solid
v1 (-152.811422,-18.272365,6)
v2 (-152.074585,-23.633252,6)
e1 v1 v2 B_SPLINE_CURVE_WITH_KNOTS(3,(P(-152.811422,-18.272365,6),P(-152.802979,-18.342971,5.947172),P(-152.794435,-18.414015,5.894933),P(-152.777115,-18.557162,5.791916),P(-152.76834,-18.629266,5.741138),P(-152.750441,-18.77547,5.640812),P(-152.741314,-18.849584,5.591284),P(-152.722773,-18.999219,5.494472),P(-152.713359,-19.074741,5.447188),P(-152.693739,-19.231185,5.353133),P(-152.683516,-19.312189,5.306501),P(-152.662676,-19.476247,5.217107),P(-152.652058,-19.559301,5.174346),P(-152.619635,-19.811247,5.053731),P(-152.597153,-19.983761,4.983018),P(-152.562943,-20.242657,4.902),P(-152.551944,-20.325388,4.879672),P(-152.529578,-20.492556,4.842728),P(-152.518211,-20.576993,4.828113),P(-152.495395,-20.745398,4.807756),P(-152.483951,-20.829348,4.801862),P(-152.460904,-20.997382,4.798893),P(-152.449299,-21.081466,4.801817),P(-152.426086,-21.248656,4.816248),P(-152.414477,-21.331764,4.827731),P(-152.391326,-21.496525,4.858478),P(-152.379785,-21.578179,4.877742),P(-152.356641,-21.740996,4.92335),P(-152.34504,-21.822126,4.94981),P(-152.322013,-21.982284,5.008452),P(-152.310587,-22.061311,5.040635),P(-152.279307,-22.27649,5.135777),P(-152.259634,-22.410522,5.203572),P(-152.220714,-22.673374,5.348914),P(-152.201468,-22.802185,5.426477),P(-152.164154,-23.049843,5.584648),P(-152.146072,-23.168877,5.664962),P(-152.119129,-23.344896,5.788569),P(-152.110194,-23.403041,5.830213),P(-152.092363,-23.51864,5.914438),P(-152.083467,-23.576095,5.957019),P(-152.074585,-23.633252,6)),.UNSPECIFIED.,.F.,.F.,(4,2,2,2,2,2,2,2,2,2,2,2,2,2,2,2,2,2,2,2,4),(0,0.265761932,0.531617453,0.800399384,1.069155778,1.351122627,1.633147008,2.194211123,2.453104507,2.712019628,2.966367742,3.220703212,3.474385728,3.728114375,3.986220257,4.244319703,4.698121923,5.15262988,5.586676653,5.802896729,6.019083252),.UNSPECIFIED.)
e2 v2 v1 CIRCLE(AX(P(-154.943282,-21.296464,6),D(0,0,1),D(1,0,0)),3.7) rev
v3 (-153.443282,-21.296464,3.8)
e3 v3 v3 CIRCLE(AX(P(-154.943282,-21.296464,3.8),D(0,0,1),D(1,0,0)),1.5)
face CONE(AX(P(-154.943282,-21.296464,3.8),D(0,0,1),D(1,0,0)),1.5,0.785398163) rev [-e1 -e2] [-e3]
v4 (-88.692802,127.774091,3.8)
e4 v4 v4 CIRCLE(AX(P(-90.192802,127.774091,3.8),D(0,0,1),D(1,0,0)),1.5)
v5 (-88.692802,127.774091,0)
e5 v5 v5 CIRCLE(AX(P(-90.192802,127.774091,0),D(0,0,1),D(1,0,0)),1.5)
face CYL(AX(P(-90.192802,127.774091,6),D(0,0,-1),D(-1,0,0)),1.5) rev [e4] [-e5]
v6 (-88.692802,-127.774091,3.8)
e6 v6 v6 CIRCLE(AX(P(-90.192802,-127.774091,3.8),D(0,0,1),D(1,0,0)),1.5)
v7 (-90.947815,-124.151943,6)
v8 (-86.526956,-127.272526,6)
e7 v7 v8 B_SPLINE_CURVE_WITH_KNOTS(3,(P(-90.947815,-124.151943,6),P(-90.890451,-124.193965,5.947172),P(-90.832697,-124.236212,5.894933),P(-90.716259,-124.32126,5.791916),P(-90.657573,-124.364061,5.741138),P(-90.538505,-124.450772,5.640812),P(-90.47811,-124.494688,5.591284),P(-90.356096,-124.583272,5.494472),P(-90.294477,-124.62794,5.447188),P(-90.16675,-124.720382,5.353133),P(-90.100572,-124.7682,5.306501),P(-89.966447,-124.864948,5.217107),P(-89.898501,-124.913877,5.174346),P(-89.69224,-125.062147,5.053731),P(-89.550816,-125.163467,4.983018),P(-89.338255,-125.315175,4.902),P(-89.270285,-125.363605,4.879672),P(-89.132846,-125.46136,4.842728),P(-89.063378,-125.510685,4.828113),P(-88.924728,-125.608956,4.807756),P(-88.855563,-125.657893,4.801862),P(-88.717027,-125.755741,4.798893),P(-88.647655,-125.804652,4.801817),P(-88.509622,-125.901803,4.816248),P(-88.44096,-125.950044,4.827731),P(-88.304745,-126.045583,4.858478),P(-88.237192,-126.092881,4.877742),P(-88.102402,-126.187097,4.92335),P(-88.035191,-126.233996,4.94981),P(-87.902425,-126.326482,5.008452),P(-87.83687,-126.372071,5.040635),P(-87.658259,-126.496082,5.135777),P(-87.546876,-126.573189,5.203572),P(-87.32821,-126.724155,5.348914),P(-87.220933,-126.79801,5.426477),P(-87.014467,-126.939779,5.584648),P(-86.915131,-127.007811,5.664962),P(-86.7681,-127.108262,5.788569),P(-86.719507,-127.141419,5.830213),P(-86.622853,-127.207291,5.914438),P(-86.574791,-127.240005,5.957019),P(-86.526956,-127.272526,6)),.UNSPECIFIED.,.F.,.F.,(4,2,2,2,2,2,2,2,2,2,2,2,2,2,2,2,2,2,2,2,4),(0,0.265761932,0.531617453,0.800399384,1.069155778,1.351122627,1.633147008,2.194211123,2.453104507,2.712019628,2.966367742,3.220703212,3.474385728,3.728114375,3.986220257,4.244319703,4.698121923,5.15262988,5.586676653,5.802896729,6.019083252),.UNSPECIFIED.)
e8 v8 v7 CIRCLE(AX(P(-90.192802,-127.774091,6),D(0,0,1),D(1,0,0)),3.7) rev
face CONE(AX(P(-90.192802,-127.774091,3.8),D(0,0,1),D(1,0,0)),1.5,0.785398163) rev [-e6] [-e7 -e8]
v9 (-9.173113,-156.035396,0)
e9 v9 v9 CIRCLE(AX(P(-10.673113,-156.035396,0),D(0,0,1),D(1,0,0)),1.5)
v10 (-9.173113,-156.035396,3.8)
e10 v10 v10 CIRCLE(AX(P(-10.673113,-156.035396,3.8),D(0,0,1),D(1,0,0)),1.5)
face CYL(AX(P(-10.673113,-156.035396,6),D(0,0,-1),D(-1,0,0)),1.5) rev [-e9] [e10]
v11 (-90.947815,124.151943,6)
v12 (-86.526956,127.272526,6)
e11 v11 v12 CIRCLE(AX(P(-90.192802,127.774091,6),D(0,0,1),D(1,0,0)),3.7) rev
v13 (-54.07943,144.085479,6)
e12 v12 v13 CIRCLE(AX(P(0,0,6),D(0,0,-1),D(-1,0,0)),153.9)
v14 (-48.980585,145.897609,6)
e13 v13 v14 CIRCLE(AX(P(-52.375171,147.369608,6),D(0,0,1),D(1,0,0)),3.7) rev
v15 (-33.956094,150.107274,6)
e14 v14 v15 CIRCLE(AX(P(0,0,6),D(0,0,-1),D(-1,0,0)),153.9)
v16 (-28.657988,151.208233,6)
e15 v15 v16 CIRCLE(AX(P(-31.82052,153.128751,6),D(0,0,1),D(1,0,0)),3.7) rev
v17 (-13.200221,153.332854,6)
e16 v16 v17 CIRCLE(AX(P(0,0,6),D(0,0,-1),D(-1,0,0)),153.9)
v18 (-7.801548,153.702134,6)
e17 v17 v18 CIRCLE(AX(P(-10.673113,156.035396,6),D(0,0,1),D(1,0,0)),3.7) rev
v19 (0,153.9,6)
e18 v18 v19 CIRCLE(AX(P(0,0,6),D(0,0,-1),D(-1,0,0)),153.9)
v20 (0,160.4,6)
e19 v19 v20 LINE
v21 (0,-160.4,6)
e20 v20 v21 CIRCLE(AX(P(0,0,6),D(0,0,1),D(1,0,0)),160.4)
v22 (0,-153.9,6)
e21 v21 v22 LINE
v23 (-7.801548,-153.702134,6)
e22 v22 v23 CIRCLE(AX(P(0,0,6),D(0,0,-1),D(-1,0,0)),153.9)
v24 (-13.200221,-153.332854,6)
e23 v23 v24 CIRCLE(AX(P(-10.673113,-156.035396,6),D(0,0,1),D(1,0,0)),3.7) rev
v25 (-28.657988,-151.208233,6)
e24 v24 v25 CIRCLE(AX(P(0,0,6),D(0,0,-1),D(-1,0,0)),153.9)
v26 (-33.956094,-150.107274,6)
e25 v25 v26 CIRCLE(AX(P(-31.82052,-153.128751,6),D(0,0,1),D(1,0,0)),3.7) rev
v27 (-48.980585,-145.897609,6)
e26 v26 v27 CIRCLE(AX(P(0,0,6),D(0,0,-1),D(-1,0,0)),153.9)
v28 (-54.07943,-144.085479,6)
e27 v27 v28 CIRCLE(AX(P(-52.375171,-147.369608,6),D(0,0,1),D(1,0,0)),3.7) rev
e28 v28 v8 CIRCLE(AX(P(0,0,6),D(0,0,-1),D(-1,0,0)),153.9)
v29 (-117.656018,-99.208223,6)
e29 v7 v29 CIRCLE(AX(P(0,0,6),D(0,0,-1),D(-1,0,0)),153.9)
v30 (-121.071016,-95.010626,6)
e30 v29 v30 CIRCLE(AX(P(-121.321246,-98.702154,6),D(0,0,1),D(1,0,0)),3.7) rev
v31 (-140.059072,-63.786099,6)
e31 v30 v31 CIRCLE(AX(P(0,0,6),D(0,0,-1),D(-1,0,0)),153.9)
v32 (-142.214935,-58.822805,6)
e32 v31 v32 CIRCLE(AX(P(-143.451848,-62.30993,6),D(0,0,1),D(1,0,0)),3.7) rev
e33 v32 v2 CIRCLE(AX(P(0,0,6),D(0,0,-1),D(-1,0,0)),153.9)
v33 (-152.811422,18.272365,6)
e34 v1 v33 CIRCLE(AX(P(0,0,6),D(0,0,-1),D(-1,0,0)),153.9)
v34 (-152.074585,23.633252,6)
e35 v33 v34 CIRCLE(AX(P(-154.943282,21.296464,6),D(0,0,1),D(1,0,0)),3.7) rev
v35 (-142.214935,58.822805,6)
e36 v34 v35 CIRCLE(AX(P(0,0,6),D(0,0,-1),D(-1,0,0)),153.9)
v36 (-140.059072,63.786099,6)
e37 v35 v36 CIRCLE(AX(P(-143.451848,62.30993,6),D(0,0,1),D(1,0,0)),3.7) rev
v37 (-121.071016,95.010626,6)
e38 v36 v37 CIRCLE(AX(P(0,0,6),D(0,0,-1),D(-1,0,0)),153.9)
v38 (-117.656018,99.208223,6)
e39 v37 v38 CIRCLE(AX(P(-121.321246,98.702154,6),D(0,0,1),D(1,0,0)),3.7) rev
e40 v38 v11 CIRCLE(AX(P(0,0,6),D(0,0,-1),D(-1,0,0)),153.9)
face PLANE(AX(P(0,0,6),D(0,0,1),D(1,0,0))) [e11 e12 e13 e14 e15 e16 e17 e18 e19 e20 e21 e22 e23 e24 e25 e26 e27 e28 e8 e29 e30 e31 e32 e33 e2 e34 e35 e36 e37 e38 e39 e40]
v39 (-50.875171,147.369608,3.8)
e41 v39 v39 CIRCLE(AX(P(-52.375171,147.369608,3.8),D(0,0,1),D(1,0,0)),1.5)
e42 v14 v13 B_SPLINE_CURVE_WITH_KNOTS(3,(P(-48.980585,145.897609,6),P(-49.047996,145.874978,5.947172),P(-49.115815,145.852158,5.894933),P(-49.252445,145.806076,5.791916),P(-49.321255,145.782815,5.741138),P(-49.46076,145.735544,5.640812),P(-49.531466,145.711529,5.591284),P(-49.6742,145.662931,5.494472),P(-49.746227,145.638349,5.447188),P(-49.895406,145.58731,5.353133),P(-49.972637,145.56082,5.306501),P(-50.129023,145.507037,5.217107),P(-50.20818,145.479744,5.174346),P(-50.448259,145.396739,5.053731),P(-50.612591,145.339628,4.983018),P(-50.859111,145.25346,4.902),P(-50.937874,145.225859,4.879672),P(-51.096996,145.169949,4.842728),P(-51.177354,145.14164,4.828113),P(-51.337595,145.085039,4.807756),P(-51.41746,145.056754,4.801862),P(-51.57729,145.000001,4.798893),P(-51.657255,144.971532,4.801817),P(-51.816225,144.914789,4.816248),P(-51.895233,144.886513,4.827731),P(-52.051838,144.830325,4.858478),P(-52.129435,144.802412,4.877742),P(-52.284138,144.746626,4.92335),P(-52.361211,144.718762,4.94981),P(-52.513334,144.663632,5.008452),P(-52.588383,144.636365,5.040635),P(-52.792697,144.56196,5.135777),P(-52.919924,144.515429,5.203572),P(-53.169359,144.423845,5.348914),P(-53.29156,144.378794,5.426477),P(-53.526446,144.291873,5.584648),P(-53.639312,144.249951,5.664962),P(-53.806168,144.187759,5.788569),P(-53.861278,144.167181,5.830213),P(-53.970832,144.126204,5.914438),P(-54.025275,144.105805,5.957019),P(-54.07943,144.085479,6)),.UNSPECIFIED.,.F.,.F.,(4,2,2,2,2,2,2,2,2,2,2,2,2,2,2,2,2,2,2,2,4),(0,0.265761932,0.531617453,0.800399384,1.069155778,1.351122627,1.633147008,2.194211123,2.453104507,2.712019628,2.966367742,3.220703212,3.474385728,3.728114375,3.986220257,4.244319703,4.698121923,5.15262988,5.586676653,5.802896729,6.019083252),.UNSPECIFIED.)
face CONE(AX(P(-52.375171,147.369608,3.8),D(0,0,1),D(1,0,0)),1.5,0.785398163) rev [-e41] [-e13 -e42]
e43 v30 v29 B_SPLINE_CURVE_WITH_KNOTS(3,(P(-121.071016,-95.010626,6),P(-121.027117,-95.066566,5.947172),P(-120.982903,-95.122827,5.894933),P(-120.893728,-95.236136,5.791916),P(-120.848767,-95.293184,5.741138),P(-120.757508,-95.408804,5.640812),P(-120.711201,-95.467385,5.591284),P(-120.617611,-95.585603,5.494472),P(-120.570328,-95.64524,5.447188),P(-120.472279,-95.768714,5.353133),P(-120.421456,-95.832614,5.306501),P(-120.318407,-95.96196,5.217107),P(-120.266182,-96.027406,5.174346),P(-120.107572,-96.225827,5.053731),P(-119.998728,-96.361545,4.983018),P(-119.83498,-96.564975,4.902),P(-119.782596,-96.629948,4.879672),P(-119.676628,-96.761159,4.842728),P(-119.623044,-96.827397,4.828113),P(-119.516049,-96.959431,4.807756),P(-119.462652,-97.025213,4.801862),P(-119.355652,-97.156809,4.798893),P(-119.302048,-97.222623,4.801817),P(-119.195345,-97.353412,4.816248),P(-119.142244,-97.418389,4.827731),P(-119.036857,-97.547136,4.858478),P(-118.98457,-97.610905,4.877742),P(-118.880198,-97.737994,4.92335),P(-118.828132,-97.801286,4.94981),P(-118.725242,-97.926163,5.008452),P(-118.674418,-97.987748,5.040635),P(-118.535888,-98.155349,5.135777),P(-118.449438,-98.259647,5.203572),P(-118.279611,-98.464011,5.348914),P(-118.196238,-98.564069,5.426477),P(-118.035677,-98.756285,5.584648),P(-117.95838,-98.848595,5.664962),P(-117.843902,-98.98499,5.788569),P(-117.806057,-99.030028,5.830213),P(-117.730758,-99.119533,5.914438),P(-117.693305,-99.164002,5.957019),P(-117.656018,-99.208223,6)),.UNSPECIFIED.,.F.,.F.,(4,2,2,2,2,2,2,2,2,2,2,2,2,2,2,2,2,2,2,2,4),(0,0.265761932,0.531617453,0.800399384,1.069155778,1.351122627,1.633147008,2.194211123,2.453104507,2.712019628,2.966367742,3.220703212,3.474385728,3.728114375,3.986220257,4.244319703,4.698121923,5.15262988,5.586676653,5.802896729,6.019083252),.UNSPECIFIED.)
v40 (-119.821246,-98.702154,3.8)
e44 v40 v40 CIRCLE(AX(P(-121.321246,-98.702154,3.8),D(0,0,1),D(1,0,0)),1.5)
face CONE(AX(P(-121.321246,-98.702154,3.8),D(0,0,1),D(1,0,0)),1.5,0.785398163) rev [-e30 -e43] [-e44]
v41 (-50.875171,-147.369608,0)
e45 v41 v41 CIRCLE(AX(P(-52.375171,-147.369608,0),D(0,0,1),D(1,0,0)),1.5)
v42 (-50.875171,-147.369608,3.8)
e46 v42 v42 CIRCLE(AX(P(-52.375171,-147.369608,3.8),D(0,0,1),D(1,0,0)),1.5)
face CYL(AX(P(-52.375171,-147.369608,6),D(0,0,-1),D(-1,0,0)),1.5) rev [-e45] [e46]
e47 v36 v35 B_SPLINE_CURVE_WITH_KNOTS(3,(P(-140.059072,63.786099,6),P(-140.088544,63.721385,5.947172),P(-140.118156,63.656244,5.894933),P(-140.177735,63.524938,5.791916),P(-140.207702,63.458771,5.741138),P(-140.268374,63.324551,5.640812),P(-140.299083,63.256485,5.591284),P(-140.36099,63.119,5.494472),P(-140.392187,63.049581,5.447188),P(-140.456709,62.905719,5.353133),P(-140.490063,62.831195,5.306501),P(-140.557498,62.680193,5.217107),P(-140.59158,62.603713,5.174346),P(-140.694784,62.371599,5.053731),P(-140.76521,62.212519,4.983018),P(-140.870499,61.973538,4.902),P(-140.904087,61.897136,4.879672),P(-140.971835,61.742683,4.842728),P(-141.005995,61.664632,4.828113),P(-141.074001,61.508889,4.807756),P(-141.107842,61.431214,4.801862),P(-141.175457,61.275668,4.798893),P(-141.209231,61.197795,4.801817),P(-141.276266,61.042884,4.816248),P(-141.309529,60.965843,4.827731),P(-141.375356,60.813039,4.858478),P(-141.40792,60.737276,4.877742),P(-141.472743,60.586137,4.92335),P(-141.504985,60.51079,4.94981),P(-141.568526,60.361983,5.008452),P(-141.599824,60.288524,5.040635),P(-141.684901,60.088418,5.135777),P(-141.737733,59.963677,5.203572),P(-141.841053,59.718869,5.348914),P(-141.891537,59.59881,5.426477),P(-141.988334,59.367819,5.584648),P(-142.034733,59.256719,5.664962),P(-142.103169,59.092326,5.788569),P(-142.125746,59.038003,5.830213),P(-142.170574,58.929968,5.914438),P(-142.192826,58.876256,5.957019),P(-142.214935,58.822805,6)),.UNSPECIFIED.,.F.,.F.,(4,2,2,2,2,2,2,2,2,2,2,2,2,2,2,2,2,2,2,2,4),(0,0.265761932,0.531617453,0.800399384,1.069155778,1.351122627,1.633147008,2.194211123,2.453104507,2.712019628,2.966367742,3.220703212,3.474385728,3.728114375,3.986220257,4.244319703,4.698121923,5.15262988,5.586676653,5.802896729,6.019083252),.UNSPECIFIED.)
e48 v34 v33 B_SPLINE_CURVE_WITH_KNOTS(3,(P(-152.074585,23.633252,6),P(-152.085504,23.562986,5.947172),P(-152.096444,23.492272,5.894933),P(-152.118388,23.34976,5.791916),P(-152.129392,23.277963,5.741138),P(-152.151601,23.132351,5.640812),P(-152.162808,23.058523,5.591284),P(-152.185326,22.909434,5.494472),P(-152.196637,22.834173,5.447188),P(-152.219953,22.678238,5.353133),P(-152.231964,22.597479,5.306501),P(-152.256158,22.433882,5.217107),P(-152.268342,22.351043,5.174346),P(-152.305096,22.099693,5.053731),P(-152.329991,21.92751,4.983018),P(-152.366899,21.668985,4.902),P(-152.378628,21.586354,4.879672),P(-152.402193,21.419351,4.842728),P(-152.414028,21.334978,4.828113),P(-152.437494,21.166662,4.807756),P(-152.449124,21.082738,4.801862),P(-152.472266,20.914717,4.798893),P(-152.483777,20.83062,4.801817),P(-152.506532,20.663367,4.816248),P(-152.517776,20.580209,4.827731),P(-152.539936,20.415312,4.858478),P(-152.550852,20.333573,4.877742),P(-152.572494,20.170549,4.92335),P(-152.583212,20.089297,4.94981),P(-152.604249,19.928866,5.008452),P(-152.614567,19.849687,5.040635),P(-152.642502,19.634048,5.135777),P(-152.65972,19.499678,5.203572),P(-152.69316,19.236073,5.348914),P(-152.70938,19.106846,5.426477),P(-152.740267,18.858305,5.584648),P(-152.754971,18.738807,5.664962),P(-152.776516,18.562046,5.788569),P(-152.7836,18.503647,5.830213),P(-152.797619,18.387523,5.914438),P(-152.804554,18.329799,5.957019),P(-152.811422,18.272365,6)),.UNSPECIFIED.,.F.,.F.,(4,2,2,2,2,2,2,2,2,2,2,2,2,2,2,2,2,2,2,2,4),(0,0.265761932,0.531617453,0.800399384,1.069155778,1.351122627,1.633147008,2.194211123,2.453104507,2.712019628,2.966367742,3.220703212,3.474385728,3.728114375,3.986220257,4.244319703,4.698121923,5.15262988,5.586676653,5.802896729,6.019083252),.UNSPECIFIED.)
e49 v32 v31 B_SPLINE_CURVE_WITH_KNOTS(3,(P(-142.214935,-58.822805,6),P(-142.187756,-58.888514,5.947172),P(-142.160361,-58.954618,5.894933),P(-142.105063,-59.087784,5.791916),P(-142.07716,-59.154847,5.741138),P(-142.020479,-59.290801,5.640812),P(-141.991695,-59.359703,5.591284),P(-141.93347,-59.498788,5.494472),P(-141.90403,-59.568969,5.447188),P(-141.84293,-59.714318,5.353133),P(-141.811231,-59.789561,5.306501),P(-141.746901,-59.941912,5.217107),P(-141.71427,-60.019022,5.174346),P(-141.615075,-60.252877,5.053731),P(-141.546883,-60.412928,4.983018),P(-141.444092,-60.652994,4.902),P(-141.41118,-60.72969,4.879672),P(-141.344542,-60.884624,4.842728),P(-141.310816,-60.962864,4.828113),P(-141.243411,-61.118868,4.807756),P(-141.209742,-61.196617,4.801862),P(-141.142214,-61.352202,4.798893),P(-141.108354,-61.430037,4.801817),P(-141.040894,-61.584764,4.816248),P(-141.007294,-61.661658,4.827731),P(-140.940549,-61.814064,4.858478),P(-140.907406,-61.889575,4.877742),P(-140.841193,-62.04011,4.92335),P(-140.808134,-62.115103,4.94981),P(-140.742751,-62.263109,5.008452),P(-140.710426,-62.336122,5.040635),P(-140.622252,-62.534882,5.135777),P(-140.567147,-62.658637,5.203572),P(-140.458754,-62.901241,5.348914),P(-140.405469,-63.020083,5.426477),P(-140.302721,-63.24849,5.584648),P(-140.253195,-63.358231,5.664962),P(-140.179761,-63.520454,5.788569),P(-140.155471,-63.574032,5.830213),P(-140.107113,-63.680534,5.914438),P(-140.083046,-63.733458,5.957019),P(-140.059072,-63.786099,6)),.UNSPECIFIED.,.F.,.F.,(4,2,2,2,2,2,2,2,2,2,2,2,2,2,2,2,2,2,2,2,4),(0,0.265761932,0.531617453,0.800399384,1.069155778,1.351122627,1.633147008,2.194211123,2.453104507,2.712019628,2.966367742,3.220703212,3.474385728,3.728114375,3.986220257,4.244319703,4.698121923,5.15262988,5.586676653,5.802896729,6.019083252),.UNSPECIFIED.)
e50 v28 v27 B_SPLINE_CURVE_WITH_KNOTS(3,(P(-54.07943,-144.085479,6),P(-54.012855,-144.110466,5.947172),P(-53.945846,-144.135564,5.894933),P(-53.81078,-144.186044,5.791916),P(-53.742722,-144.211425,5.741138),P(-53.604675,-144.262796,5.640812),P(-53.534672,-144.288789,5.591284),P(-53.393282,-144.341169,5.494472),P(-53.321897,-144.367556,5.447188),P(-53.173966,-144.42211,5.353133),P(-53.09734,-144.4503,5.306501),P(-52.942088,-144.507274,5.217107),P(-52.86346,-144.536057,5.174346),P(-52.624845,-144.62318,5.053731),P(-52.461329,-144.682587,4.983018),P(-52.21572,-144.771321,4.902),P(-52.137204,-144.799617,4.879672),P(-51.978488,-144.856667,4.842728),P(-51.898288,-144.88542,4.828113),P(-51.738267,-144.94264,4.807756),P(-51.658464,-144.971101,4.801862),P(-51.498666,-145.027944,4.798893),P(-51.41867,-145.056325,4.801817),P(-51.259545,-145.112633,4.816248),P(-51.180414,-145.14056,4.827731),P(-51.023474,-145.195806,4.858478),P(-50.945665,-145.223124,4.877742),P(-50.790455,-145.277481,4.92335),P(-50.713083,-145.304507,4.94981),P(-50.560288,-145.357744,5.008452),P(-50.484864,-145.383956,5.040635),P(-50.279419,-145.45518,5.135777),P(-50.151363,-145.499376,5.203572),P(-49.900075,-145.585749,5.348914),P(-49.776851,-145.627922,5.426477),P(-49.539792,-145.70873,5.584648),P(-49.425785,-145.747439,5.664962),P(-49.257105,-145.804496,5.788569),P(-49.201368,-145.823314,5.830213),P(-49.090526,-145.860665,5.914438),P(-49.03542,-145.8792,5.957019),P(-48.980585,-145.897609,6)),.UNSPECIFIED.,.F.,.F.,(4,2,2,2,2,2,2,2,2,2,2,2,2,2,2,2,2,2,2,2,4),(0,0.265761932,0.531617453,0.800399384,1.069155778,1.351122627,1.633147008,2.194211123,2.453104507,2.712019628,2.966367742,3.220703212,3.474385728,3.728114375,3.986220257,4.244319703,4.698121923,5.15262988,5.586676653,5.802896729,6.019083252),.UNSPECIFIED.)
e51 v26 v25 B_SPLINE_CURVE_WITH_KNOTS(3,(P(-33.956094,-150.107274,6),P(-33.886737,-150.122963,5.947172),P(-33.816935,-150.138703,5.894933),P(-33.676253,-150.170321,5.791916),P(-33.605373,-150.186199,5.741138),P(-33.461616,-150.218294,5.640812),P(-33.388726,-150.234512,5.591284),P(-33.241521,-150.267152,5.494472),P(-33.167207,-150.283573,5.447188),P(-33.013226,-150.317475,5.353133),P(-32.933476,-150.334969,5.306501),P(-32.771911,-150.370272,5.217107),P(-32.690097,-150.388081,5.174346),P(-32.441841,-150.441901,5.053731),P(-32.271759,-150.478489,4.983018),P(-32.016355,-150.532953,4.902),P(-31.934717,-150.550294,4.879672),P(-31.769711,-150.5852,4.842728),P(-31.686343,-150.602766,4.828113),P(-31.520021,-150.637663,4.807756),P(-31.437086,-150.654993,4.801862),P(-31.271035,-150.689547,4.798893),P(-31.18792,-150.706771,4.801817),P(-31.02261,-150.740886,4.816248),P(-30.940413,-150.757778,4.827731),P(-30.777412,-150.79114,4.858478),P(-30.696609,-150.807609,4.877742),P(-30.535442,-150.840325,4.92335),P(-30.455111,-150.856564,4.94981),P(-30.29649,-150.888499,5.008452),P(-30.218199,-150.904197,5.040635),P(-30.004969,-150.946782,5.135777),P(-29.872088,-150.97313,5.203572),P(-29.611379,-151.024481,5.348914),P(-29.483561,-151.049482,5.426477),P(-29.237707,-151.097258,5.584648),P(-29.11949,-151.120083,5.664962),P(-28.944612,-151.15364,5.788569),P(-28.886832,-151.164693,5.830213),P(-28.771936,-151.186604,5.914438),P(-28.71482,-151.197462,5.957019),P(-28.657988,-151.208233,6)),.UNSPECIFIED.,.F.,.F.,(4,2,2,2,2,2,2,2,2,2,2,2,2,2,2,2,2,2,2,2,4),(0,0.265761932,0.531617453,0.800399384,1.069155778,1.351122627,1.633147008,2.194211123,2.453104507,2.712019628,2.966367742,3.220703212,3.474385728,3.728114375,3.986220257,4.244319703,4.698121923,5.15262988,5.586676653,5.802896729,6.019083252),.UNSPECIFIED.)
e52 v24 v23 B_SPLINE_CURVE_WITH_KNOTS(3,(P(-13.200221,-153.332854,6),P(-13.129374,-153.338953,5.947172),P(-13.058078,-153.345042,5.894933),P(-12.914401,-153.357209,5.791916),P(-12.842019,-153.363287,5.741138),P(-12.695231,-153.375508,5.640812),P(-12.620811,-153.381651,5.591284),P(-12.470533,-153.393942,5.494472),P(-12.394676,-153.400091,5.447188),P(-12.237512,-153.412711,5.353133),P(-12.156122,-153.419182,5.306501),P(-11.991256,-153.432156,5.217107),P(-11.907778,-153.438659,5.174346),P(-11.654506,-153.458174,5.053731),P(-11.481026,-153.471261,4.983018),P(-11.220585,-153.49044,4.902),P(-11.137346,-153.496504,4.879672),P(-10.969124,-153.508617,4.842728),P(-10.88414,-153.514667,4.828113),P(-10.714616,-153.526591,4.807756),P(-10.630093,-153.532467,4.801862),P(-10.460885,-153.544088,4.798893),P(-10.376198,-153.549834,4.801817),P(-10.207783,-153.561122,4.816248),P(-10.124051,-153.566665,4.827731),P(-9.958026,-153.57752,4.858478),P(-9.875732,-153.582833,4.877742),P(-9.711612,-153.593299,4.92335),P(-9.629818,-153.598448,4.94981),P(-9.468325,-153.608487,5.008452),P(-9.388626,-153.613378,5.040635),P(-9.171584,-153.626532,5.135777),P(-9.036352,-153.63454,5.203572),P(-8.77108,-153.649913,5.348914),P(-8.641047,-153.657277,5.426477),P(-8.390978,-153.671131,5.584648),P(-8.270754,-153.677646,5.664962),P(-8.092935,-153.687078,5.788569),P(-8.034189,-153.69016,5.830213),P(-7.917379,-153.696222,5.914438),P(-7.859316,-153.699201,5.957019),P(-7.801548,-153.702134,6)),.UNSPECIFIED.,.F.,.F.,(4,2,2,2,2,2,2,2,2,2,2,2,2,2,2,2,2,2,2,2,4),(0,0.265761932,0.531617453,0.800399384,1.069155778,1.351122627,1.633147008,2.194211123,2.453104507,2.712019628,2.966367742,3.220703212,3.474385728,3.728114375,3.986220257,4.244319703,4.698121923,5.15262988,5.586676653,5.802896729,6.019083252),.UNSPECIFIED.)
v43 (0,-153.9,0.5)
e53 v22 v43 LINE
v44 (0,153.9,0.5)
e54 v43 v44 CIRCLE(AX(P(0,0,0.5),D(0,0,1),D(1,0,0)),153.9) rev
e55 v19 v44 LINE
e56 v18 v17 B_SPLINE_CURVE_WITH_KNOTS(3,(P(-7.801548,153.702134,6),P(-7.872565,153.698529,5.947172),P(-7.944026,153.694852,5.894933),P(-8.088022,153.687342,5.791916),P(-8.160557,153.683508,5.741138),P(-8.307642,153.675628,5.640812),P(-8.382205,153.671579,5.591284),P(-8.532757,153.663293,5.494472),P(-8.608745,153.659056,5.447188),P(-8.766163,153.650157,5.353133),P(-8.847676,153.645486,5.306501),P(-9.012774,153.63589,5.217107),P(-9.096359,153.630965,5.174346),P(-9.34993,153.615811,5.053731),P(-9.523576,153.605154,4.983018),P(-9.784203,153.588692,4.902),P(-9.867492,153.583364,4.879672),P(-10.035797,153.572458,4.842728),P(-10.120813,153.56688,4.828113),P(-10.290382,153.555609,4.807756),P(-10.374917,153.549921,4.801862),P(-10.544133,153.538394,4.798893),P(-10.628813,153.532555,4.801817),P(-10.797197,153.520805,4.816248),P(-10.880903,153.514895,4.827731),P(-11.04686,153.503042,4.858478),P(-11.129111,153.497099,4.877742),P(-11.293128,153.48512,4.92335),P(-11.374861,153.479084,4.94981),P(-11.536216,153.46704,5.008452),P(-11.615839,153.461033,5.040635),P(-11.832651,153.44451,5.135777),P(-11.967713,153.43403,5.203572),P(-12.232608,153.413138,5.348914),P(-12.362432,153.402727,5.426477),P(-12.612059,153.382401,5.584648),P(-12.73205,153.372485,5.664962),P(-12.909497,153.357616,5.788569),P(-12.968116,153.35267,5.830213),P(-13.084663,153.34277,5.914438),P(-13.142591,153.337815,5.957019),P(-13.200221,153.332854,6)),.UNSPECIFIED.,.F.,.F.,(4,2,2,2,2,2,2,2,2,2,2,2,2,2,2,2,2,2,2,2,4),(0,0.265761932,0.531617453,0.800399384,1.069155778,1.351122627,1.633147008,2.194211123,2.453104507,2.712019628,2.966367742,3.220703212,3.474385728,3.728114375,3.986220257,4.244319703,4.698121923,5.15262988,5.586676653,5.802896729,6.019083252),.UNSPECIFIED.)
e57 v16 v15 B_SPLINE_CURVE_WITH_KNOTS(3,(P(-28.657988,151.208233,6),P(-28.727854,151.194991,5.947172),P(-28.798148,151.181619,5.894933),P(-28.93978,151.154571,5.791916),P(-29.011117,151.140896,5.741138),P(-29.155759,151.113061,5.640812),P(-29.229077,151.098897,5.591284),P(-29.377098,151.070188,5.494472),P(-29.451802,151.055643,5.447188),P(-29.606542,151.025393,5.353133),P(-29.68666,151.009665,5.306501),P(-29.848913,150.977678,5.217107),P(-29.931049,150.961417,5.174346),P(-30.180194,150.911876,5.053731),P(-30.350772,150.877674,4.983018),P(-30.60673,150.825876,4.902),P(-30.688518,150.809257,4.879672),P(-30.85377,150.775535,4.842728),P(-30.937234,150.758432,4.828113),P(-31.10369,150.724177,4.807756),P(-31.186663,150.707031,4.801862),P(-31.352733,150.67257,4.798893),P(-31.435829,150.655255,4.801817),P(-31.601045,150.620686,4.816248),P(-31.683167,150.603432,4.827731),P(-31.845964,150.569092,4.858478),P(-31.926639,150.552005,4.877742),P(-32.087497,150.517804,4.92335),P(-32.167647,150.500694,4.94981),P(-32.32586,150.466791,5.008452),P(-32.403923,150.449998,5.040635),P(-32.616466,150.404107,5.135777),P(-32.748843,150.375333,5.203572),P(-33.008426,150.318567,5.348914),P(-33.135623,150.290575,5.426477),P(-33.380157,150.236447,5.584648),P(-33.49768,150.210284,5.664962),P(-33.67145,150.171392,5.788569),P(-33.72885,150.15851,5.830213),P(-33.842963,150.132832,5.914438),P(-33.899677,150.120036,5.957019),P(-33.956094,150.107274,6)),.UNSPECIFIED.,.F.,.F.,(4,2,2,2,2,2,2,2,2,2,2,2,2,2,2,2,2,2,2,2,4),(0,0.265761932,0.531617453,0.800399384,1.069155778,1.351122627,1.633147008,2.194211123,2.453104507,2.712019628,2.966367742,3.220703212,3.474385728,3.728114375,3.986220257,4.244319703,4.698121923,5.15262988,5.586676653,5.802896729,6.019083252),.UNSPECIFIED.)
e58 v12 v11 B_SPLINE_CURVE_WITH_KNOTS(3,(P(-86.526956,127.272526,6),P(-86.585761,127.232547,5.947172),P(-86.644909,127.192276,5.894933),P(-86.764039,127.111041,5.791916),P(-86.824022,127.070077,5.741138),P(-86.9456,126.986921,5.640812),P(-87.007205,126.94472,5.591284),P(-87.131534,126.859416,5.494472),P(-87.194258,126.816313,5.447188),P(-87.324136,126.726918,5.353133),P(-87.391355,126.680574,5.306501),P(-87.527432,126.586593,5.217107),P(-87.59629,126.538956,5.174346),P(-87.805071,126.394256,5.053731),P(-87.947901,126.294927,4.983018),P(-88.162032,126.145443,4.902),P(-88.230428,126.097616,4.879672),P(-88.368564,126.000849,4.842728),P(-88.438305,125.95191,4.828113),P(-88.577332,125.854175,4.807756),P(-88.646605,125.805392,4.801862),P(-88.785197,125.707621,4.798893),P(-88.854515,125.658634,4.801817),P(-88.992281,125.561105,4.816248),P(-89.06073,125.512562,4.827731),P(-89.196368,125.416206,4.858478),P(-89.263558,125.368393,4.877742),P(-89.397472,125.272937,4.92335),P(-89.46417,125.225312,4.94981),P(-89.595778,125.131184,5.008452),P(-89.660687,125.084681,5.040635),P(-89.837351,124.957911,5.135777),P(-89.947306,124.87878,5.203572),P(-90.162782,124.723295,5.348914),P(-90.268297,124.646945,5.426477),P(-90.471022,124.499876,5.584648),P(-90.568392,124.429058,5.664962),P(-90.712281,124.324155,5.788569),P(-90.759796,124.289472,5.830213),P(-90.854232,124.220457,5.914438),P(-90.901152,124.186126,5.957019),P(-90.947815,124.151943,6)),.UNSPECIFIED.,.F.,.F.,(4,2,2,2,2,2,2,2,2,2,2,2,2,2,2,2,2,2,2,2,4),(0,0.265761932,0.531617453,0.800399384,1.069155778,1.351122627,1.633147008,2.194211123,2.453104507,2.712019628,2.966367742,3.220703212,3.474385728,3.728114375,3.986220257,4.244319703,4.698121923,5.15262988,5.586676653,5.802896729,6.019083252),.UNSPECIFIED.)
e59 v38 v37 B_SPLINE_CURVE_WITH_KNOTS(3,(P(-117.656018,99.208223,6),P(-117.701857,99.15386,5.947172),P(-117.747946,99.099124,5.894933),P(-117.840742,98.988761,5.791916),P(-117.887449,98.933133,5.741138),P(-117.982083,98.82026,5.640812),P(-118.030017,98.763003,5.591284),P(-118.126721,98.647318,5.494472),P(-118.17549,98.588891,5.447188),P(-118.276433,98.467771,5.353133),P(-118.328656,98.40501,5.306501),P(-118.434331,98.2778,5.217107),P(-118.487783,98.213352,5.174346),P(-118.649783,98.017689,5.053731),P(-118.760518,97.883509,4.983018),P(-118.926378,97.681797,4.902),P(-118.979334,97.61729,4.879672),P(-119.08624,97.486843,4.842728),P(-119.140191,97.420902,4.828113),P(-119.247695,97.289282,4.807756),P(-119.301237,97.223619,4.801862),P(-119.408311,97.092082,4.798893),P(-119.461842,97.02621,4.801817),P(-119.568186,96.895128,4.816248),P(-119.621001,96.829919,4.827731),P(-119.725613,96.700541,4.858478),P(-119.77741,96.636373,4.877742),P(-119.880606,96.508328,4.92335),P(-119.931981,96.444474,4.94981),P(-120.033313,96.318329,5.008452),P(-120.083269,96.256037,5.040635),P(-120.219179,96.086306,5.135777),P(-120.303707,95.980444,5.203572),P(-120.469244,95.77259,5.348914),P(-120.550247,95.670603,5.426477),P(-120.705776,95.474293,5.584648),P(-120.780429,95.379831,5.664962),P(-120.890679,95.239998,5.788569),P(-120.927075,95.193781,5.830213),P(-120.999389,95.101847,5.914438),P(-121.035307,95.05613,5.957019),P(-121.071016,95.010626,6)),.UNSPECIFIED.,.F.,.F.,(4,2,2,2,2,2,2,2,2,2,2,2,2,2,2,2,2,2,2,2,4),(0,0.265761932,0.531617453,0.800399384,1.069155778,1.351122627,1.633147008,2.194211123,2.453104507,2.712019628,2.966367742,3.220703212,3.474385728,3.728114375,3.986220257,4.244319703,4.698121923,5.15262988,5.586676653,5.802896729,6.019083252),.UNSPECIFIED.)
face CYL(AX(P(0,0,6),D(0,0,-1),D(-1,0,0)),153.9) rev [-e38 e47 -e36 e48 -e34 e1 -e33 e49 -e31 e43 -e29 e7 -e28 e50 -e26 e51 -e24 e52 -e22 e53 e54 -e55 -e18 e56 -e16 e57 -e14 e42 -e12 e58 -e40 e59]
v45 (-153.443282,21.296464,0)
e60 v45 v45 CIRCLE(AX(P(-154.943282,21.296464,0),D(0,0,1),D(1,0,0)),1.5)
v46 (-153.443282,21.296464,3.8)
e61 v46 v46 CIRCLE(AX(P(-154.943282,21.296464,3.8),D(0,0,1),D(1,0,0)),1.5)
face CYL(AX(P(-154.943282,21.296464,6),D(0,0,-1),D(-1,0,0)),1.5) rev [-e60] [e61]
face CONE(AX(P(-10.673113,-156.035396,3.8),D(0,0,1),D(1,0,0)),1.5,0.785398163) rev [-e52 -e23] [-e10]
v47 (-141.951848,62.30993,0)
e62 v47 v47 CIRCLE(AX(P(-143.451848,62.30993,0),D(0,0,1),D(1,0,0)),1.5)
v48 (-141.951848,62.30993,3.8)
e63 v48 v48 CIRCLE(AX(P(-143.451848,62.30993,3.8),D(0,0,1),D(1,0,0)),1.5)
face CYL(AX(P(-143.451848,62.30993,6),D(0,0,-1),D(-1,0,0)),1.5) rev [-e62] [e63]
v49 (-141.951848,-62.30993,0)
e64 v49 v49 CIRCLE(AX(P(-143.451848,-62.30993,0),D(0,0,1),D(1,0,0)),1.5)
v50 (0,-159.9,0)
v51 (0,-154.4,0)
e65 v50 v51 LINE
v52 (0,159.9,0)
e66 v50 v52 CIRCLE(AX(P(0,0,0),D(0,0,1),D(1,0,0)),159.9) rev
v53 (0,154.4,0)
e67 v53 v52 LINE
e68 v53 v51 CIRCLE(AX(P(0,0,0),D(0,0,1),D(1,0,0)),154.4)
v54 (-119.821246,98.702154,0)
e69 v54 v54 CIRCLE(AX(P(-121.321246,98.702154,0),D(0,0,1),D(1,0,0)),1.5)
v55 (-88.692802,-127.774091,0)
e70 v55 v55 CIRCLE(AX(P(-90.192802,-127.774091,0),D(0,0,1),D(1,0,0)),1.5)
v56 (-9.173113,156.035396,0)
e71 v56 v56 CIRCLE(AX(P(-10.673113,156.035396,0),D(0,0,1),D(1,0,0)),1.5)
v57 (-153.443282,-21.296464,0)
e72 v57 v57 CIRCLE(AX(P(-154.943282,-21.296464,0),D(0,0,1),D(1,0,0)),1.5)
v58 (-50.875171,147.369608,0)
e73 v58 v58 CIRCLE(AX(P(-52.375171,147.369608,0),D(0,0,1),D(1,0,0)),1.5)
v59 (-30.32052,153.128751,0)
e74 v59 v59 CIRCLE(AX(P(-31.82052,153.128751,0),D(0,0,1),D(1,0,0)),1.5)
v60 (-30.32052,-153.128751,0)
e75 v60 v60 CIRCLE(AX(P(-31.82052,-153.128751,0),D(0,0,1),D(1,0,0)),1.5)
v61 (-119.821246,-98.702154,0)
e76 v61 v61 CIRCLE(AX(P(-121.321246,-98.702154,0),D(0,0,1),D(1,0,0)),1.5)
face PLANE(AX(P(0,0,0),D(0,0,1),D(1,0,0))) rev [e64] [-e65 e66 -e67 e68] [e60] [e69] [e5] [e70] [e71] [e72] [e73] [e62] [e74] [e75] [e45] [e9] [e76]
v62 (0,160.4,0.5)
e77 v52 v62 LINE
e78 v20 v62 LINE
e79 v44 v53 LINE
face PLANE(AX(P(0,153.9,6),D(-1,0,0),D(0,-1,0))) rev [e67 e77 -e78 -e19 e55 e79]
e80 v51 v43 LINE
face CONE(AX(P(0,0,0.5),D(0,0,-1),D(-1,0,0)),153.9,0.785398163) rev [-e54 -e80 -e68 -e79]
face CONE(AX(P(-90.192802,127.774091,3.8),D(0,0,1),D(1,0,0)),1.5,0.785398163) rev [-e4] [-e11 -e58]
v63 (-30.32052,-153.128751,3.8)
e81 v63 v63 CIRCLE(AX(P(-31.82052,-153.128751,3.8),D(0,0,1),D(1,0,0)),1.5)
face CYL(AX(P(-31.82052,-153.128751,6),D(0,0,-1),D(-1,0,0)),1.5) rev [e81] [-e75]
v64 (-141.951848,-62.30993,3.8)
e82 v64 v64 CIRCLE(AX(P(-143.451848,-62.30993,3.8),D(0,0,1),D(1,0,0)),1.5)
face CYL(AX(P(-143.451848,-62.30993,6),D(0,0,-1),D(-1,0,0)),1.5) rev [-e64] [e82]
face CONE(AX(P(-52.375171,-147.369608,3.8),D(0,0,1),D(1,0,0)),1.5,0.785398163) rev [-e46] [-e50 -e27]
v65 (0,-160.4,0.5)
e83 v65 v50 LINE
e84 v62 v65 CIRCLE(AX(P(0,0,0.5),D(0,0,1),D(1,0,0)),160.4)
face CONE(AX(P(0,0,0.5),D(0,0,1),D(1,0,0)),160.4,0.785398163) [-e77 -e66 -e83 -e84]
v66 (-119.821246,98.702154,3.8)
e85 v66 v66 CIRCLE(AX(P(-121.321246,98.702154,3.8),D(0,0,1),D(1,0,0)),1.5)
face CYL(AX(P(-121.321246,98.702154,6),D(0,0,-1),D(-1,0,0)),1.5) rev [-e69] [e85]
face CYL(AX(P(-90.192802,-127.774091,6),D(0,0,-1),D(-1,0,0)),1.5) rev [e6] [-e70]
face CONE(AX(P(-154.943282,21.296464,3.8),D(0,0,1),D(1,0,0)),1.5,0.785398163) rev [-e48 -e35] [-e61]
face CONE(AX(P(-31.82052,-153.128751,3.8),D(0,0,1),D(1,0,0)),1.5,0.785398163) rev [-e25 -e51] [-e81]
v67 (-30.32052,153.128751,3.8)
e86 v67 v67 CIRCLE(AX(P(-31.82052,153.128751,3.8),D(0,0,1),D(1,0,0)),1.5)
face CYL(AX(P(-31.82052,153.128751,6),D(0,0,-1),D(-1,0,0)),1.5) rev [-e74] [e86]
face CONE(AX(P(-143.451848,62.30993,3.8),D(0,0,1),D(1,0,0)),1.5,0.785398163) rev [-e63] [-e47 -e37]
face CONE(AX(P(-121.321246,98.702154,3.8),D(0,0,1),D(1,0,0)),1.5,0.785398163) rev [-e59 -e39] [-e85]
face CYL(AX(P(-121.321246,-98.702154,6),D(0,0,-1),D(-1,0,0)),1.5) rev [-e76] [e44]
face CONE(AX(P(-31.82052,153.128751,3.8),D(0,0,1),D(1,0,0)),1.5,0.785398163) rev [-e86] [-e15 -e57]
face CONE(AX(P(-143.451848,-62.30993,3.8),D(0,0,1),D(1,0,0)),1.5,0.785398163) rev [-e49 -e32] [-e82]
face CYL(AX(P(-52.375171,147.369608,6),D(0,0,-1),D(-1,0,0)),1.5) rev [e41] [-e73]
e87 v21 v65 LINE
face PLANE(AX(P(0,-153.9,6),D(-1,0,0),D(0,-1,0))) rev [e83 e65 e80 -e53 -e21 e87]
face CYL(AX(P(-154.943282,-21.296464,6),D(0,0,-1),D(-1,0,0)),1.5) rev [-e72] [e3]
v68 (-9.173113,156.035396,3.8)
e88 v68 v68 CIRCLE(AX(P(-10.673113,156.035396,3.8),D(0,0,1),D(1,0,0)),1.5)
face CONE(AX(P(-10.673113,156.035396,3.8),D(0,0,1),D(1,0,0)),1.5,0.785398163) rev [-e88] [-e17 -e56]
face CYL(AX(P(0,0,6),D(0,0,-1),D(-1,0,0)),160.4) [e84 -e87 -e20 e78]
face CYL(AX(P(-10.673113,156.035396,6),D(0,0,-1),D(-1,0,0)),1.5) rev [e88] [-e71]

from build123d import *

# Parameters (mm, degrees)
SKETCH1_R           = 1.5
BOSS_EXTRUDE1_DEPTH = 6
CHAMFER2_SIZE       = 0.500000016


with BuildPart() as part:
    # Sketch1 → Boss-Extrude1 (new body)
    with BuildSketch(Plane.XY):
        with BuildLine():
            Line((0, -153.9), (0, -160.4))
            ThreePointArc((0, -160.4), (-160.4, 0), (0, 160.4))
            Line((0, 160.4), (0, 153.9))
            ThreePointArc((0, 153.9), (-153.9, 0), (0, -153.9))
        make_face()
        with Locations((-10.67311345, 156.035395501)):
            Circle(SKETCH1_R, mode=Mode.SUBTRACT)
        with Locations((-31.820520441, 153.128751314)):
            Circle(SKETCH1_R, mode=Mode.SUBTRACT)
        with Locations((-52.375171344, 147.369608219)):
            Circle(SKETCH1_R, mode=Mode.SUBTRACT)
        with Locations((-154.94328196, 21.296463919)):
            Circle(SKETCH1_R, mode=Mode.SUBTRACT)
        with Locations((-143.451847555, 62.309930452)):
            Circle(SKETCH1_R, mode=Mode.SUBTRACT)
        with Locations((-121.321245866, 98.702154493)):
            Circle(SKETCH1_R, mode=Mode.SUBTRACT)
        with Locations((-90.192802379, 127.774091267)):
            Circle(SKETCH1_R, mode=Mode.SUBTRACT)
        with Locations((-154.94328196, -21.296463919)):
            Circle(SKETCH1_R, mode=Mode.SUBTRACT)
        with Locations((-143.451847555, -62.309930452)):
            Circle(SKETCH1_R, mode=Mode.SUBTRACT)
        with Locations((-121.321245866, -98.702154493)):
            Circle(SKETCH1_R, mode=Mode.SUBTRACT)
        with Locations((-90.192802379, -127.774091267)):
            Circle(SKETCH1_R, mode=Mode.SUBTRACT)
        with Locations((-52.375171344, -147.369608219)):
            Circle(SKETCH1_R, mode=Mode.SUBTRACT)
        with Locations((-10.67311345, -156.035395501)):
            Circle(SKETCH1_R, mode=Mode.SUBTRACT)
        with Locations((-31.820520441, -153.128751314)):
            Circle(SKETCH1_R, mode=Mode.SUBTRACT)
    extrude(amount=BOSS_EXTRUDE1_DEPTH)

    # Chamfer1: read off the stored shape, not the designer's step
    # Chamfer1: loft between two sections, ruled curve by curve
    chamfer1_from = [
        Edge.make_three_point_arc((-9.17311345, -156.035395501, 3.8), (-10.67311345, -154.535395501, 3.8), (-12.17311345, -156.035395501, 3.8)),
        Edge.make_three_point_arc((-12.17311345, -156.035395501, 3.8), (-10.67311345, -157.535395501, 3.8), (-9.17311345, -156.035395501, 3.8)),
    ]
    chamfer1_to = [
        Edge.make_three_point_arc((-6.97311345, -156.035395501, 6), (-10.67311345, -152.335395501, 6), (-14.37311345, -156.035395501, 6)),
        Edge.make_three_point_arc((-14.37311345, -156.035395501, 6), (-10.67311345, -159.735395501, 6), (-6.97311345, -156.035395501, 6)),
    ]
    chamfer1 = Solid(Shell([*[Face.make_surface_from_curves(chamfer1_from[k], chamfer1_to[k]) for k in range(2)], Face(Wire(chamfer1_from)), Face(Wire(chamfer1_to))]))
    add(chamfer1, mode=Mode.SUBTRACT)

    # Chamfer1 2: loft between two sections, ruled curve by curve
    chamfer1_2_from = [
        Edge.make_three_point_arc((-30.320520441, -153.128751314, 3.8), (-31.820520441, -151.628751314, 3.8), (-33.320520441, -153.128751314, 3.8)),
        Edge.make_three_point_arc((-33.320520441, -153.128751314, 3.8), (-31.820520441, -154.628751314, 3.8), (-30.320520441, -153.128751314, 3.8)),
    ]
    chamfer1_2_to = [
        Edge.make_three_point_arc((-28.120520441, -153.128751314, 6), (-31.820520441, -149.428751314, 6), (-35.520520441, -153.128751314, 6)),
        Edge.make_three_point_arc((-35.520520441, -153.128751314, 6), (-31.820520441, -156.828751314, 6), (-28.120520441, -153.128751314, 6)),
    ]
    chamfer1_2 = Solid(Shell([*[Face.make_surface_from_curves(chamfer1_2_from[k], chamfer1_2_to[k]) for k in range(2)], Face(Wire(chamfer1_2_from)), Face(Wire(chamfer1_2_to))]))
    add(chamfer1_2, mode=Mode.SUBTRACT)

    # Chamfer1 3: loft between two sections, ruled curve by curve
    chamfer1_3_from = [
        Edge.make_three_point_arc((-50.875171344, -147.369608219, 3.8), (-52.375171344, -145.869608219, 3.8), (-53.875171344, -147.369608219, 3.8)),
        Edge.make_three_point_arc((-53.875171344, -147.369608219, 3.8), (-52.375171344, -148.869608219, 3.8), (-50.875171344, -147.369608219, 3.8)),
    ]
    chamfer1_3_to = [
        Edge.make_three_point_arc((-48.675171344, -147.369608219, 6), (-52.375171344, -143.669608219, 6), (-56.075171344, -147.369608219, 6)),
        Edge.make_three_point_arc((-56.075171344, -147.369608219, 6), (-52.375171344, -151.069608219, 6), (-48.675171344, -147.369608219, 6)),
    ]
    chamfer1_3 = Solid(Shell([*[Face.make_surface_from_curves(chamfer1_3_from[k], chamfer1_3_to[k]) for k in range(2)], Face(Wire(chamfer1_3_from)), Face(Wire(chamfer1_3_to))]))
    add(chamfer1_3, mode=Mode.SUBTRACT)

    # Chamfer1 4: loft between two sections, ruled curve by curve
    chamfer1_4_from = [
        Edge.make_three_point_arc((-88.692802379, -127.774091267, 3.8), (-90.192802379, -126.274091267, 3.8), (-91.692802379, -127.774091267, 3.8)),
        Edge.make_three_point_arc((-91.692802379, -127.774091267, 3.8), (-90.192802379, -129.274091267, 3.8), (-88.692802379, -127.774091267, 3.8)),
    ]
    chamfer1_4_to = [
        Edge.make_three_point_arc((-86.492802379, -127.774091267, 6), (-90.192802379, -124.074091267, 6), (-93.892802379, -127.774091267, 6)),
        Edge.make_three_point_arc((-93.892802379, -127.774091267, 6), (-90.192802379, -131.474091267, 6), (-86.492802379, -127.774091267, 6)),
    ]
    chamfer1_4 = Solid(Shell([*[Face.make_surface_from_curves(chamfer1_4_from[k], chamfer1_4_to[k]) for k in range(2)], Face(Wire(chamfer1_4_from)), Face(Wire(chamfer1_4_to))]))
    add(chamfer1_4, mode=Mode.SUBTRACT)

    # Chamfer1 5: loft between two sections, ruled curve by curve
    chamfer1_5_from = [
        Edge.make_three_point_arc((-119.821245866, -98.702154493, 3.8), (-121.321245866, -97.202154493, 3.8), (-122.821245866, -98.702154493, 3.8)),
        Edge.make_three_point_arc((-122.821245866, -98.702154493, 3.8), (-121.321245866, -100.202154493, 3.8), (-119.821245866, -98.702154493, 3.8)),
    ]
    chamfer1_5_to = [
        Edge.make_three_point_arc((-117.621245866, -98.702154493, 6), (-121.321245866, -95.002154493, 6), (-125.021245866, -98.702154493, 6)),
        Edge.make_three_point_arc((-125.021245866, -98.702154493, 6), (-121.321245866, -102.402154493, 6), (-117.621245866, -98.702154493, 6)),
    ]
    chamfer1_5 = Solid(Shell([*[Face.make_surface_from_curves(chamfer1_5_from[k], chamfer1_5_to[k]) for k in range(2)], Face(Wire(chamfer1_5_from)), Face(Wire(chamfer1_5_to))]))
    add(chamfer1_5, mode=Mode.SUBTRACT)

    # Chamfer1 6: loft between two sections, ruled curve by curve
    chamfer1_6_from = [
        Edge.make_three_point_arc((-141.951847555, -62.309930452, 3.8), (-143.451847555, -60.809930452, 3.8), (-144.951847555, -62.309930452, 3.8)),
        Edge.make_three_point_arc((-144.951847555, -62.309930452, 3.8), (-143.451847555, -63.809930452, 3.8), (-141.951847555, -62.309930452, 3.8)),
    ]
    chamfer1_6_to = [
        Edge.make_three_point_arc((-139.751847555, -62.309930452, 6), (-143.451847555, -58.609930452, 6), (-147.151847555, -62.309930452, 6)),
        Edge.make_three_point_arc((-147.151847555, -62.309930452, 6), (-143.451847555, -66.009930452, 6), (-139.751847555, -62.309930452, 6)),
    ]
    chamfer1_6 = Solid(Shell([*[Face.make_surface_from_curves(chamfer1_6_from[k], chamfer1_6_to[k]) for k in range(2)], Face(Wire(chamfer1_6_from)), Face(Wire(chamfer1_6_to))]))
    add(chamfer1_6, mode=Mode.SUBTRACT)

    # Chamfer1 7: loft between two sections, ruled curve by curve
    chamfer1_7_from = [
        Edge.make_three_point_arc((-153.44328196, -21.296463919, 3.8), (-154.94328196, -19.796463919, 3.8), (-156.44328196, -21.296463919, 3.8)),
        Edge.make_three_point_arc((-156.44328196, -21.296463919, 3.8), (-154.94328196, -22.796463919, 3.8), (-153.44328196, -21.296463919, 3.8)),
    ]
    chamfer1_7_to = [
        Edge.make_three_point_arc((-151.24328196, -21.296463919, 6), (-154.94328196, -17.596463919, 6), (-158.64328196, -21.296463919, 6)),
        Edge.make_three_point_arc((-158.64328196, -21.296463919, 6), (-154.94328196, -24.996463919, 6), (-151.24328196, -21.296463919, 6)),
    ]
    chamfer1_7 = Solid(Shell([*[Face.make_surface_from_curves(chamfer1_7_from[k], chamfer1_7_to[k]) for k in range(2)], Face(Wire(chamfer1_7_from)), Face(Wire(chamfer1_7_to))]))
    add(chamfer1_7, mode=Mode.SUBTRACT)

    # Chamfer1 8: loft between two sections, ruled curve by curve
    chamfer1_8_from = [
        Edge.make_three_point_arc((-153.44328196, 21.296463919, 3.8), (-154.94328196, 22.796463919, 3.8), (-156.44328196, 21.296463919, 3.8)),
        Edge.make_three_point_arc((-156.44328196, 21.296463919, 3.8), (-154.94328196, 19.796463919, 3.8), (-153.44328196, 21.296463919, 3.8)),
    ]
    chamfer1_8_to = [
        Edge.make_three_point_arc((-151.24328196, 21.296463919, 6), (-154.94328196, 24.996463919, 6), (-158.64328196, 21.296463919, 6)),
        Edge.make_three_point_arc((-158.64328196, 21.296463919, 6), (-154.94328196, 17.596463919, 6), (-151.24328196, 21.296463919, 6)),
    ]
    chamfer1_8 = Solid(Shell([*[Face.make_surface_from_curves(chamfer1_8_from[k], chamfer1_8_to[k]) for k in range(2)], Face(Wire(chamfer1_8_from)), Face(Wire(chamfer1_8_to))]))
    add(chamfer1_8, mode=Mode.SUBTRACT)

    # Chamfer1 9: loft between two sections, ruled curve by curve
    chamfer1_9_from = [
        Edge.make_three_point_arc((-141.951847555, 62.309930452, 3.8), (-143.451847555, 63.809930452, 3.8), (-144.951847555, 62.309930452, 3.8)),
        Edge.make_three_point_arc((-144.951847555, 62.309930452, 3.8), (-143.451847555, 60.809930452, 3.8), (-141.951847555, 62.309930452, 3.8)),
    ]
    chamfer1_9_to = [
        Edge.make_three_point_arc((-139.751847555, 62.309930452, 6), (-143.451847555, 66.009930452, 6), (-147.151847555, 62.309930452, 6)),
        Edge.make_three_point_arc((-147.151847555, 62.309930452, 6), (-143.451847555, 58.609930452, 6), (-139.751847555, 62.309930452, 6)),
    ]
    chamfer1_9 = Solid(Shell([*[Face.make_surface_from_curves(chamfer1_9_from[k], chamfer1_9_to[k]) for k in range(2)], Face(Wire(chamfer1_9_from)), Face(Wire(chamfer1_9_to))]))
    add(chamfer1_9, mode=Mode.SUBTRACT)

    # Chamfer1 10: loft between two sections, ruled curve by curve
    chamfer1_10_from = [
        Edge.make_three_point_arc((-119.821245866, 98.702154493, 3.8), (-121.321245866, 100.202154493, 3.8), (-122.821245866, 98.702154493, 3.8)),
        Edge.make_three_point_arc((-122.821245866, 98.702154493, 3.8), (-121.321245866, 97.202154493, 3.8), (-119.821245866, 98.702154493, 3.8)),
    ]
    chamfer1_10_to = [
        Edge.make_three_point_arc((-117.621245866, 98.702154493, 6), (-121.321245866, 102.402154493, 6), (-125.021245866, 98.702154493, 6)),
        Edge.make_three_point_arc((-125.021245866, 98.702154493, 6), (-121.321245866, 95.002154493, 6), (-117.621245866, 98.702154493, 6)),
    ]
    chamfer1_10 = Solid(Shell([*[Face.make_surface_from_curves(chamfer1_10_from[k], chamfer1_10_to[k]) for k in range(2)], Face(Wire(chamfer1_10_from)), Face(Wire(chamfer1_10_to))]))
    add(chamfer1_10, mode=Mode.SUBTRACT)

    # Chamfer1 11: loft between two sections, ruled curve by curve
    chamfer1_11_from = [
        Edge.make_three_point_arc((-88.692802379, 127.774091267, 3.8), (-90.192802379, 129.274091267, 3.8), (-91.692802379, 127.774091267, 3.8)),
        Edge.make_three_point_arc((-91.692802379, 127.774091267, 3.8), (-90.192802379, 126.274091267, 3.8), (-88.692802379, 127.774091267, 3.8)),
    ]
    chamfer1_11_to = [
        Edge.make_three_point_arc((-86.492802379, 127.774091267, 6), (-90.192802379, 131.474091267, 6), (-93.892802379, 127.774091267, 6)),
        Edge.make_three_point_arc((-93.892802379, 127.774091267, 6), (-90.192802379, 124.074091267, 6), (-86.492802379, 127.774091267, 6)),
    ]
    chamfer1_11 = Solid(Shell([*[Face.make_surface_from_curves(chamfer1_11_from[k], chamfer1_11_to[k]) for k in range(2)], Face(Wire(chamfer1_11_from)), Face(Wire(chamfer1_11_to))]))
    add(chamfer1_11, mode=Mode.SUBTRACT)

    # Chamfer1 12: loft between two sections, ruled curve by curve
    chamfer1_12_from = [
        Edge.make_three_point_arc((-50.875171344, 147.369608219, 3.8), (-52.375171344, 148.869608219, 3.8), (-53.875171344, 147.369608219, 3.8)),
        Edge.make_three_point_arc((-53.875171344, 147.369608219, 3.8), (-52.375171344, 145.869608219, 3.8), (-50.875171344, 147.369608219, 3.8)),
    ]
    chamfer1_12_to = [
        Edge.make_three_point_arc((-48.675171344, 147.369608219, 6), (-52.375171344, 151.069608219, 6), (-56.075171344, 147.369608219, 6)),
        Edge.make_three_point_arc((-56.075171344, 147.369608219, 6), (-52.375171344, 143.669608219, 6), (-48.675171344, 147.369608219, 6)),
    ]
    chamfer1_12 = Solid(Shell([*[Face.make_surface_from_curves(chamfer1_12_from[k], chamfer1_12_to[k]) for k in range(2)], Face(Wire(chamfer1_12_from)), Face(Wire(chamfer1_12_to))]))
    add(chamfer1_12, mode=Mode.SUBTRACT)

    # Chamfer1 13: loft between two sections, ruled curve by curve
    chamfer1_13_from = [
        Edge.make_three_point_arc((-30.320520441, 153.128751314, 3.8), (-31.820520441, 154.628751314, 3.8), (-33.320520441, 153.128751314, 3.8)),
        Edge.make_three_point_arc((-33.320520441, 153.128751314, 3.8), (-31.820520441, 151.628751314, 3.8), (-30.320520441, 153.128751314, 3.8)),
    ]
    chamfer1_13_to = [
        Edge.make_three_point_arc((-28.120520441, 153.128751314, 6), (-31.820520441, 156.828751314, 6), (-35.520520441, 153.128751314, 6)),
        Edge.make_three_point_arc((-35.520520441, 153.128751314, 6), (-31.820520441, 149.428751314, 6), (-28.120520441, 153.128751314, 6)),
    ]
    chamfer1_13 = Solid(Shell([*[Face.make_surface_from_curves(chamfer1_13_from[k], chamfer1_13_to[k]) for k in range(2)], Face(Wire(chamfer1_13_from)), Face(Wire(chamfer1_13_to))]))
    add(chamfer1_13, mode=Mode.SUBTRACT)

    # Chamfer1 14: loft between two sections, ruled curve by curve
    chamfer1_14_from = [
        Edge.make_three_point_arc((-9.17311345, 156.035395501, 3.8), (-10.67311345, 157.535395501, 3.8), (-12.17311345, 156.035395501, 3.8)),
        Edge.make_three_point_arc((-12.17311345, 156.035395501, 3.8), (-10.67311345, 154.535395501, 3.8), (-9.17311345, 156.035395501, 3.8)),
    ]
    chamfer1_14_to = [
        Edge.make_three_point_arc((-6.97311345, 156.035395501, 6), (-10.67311345, 159.735395501, 6), (-14.37311345, 156.035395501, 6)),
        Edge.make_three_point_arc((-14.37311345, 156.035395501, 6), (-10.67311345, 152.335395501, 6), (-6.97311345, 156.035395501, 6)),
    ]
    chamfer1_14 = Solid(Shell([*[Face.make_surface_from_curves(chamfer1_14_from[k], chamfer1_14_to[k]) for k in range(2)], Face(Wire(chamfer1_14_from)), Face(Wire(chamfer1_14_to))]))
    add(chamfer1_14, mode=Mode.SUBTRACT)

    # Chamfer2
    chamfer2_edges = [part.edges().sort_by_distance(p)[0] for p in [
        (-153.9, 0, 0),
        (-160.4, 0, 0),
    ]]
    chamfer(chamfer2_edges, length=CHAMFER2_SIZE)


solid = part.part
